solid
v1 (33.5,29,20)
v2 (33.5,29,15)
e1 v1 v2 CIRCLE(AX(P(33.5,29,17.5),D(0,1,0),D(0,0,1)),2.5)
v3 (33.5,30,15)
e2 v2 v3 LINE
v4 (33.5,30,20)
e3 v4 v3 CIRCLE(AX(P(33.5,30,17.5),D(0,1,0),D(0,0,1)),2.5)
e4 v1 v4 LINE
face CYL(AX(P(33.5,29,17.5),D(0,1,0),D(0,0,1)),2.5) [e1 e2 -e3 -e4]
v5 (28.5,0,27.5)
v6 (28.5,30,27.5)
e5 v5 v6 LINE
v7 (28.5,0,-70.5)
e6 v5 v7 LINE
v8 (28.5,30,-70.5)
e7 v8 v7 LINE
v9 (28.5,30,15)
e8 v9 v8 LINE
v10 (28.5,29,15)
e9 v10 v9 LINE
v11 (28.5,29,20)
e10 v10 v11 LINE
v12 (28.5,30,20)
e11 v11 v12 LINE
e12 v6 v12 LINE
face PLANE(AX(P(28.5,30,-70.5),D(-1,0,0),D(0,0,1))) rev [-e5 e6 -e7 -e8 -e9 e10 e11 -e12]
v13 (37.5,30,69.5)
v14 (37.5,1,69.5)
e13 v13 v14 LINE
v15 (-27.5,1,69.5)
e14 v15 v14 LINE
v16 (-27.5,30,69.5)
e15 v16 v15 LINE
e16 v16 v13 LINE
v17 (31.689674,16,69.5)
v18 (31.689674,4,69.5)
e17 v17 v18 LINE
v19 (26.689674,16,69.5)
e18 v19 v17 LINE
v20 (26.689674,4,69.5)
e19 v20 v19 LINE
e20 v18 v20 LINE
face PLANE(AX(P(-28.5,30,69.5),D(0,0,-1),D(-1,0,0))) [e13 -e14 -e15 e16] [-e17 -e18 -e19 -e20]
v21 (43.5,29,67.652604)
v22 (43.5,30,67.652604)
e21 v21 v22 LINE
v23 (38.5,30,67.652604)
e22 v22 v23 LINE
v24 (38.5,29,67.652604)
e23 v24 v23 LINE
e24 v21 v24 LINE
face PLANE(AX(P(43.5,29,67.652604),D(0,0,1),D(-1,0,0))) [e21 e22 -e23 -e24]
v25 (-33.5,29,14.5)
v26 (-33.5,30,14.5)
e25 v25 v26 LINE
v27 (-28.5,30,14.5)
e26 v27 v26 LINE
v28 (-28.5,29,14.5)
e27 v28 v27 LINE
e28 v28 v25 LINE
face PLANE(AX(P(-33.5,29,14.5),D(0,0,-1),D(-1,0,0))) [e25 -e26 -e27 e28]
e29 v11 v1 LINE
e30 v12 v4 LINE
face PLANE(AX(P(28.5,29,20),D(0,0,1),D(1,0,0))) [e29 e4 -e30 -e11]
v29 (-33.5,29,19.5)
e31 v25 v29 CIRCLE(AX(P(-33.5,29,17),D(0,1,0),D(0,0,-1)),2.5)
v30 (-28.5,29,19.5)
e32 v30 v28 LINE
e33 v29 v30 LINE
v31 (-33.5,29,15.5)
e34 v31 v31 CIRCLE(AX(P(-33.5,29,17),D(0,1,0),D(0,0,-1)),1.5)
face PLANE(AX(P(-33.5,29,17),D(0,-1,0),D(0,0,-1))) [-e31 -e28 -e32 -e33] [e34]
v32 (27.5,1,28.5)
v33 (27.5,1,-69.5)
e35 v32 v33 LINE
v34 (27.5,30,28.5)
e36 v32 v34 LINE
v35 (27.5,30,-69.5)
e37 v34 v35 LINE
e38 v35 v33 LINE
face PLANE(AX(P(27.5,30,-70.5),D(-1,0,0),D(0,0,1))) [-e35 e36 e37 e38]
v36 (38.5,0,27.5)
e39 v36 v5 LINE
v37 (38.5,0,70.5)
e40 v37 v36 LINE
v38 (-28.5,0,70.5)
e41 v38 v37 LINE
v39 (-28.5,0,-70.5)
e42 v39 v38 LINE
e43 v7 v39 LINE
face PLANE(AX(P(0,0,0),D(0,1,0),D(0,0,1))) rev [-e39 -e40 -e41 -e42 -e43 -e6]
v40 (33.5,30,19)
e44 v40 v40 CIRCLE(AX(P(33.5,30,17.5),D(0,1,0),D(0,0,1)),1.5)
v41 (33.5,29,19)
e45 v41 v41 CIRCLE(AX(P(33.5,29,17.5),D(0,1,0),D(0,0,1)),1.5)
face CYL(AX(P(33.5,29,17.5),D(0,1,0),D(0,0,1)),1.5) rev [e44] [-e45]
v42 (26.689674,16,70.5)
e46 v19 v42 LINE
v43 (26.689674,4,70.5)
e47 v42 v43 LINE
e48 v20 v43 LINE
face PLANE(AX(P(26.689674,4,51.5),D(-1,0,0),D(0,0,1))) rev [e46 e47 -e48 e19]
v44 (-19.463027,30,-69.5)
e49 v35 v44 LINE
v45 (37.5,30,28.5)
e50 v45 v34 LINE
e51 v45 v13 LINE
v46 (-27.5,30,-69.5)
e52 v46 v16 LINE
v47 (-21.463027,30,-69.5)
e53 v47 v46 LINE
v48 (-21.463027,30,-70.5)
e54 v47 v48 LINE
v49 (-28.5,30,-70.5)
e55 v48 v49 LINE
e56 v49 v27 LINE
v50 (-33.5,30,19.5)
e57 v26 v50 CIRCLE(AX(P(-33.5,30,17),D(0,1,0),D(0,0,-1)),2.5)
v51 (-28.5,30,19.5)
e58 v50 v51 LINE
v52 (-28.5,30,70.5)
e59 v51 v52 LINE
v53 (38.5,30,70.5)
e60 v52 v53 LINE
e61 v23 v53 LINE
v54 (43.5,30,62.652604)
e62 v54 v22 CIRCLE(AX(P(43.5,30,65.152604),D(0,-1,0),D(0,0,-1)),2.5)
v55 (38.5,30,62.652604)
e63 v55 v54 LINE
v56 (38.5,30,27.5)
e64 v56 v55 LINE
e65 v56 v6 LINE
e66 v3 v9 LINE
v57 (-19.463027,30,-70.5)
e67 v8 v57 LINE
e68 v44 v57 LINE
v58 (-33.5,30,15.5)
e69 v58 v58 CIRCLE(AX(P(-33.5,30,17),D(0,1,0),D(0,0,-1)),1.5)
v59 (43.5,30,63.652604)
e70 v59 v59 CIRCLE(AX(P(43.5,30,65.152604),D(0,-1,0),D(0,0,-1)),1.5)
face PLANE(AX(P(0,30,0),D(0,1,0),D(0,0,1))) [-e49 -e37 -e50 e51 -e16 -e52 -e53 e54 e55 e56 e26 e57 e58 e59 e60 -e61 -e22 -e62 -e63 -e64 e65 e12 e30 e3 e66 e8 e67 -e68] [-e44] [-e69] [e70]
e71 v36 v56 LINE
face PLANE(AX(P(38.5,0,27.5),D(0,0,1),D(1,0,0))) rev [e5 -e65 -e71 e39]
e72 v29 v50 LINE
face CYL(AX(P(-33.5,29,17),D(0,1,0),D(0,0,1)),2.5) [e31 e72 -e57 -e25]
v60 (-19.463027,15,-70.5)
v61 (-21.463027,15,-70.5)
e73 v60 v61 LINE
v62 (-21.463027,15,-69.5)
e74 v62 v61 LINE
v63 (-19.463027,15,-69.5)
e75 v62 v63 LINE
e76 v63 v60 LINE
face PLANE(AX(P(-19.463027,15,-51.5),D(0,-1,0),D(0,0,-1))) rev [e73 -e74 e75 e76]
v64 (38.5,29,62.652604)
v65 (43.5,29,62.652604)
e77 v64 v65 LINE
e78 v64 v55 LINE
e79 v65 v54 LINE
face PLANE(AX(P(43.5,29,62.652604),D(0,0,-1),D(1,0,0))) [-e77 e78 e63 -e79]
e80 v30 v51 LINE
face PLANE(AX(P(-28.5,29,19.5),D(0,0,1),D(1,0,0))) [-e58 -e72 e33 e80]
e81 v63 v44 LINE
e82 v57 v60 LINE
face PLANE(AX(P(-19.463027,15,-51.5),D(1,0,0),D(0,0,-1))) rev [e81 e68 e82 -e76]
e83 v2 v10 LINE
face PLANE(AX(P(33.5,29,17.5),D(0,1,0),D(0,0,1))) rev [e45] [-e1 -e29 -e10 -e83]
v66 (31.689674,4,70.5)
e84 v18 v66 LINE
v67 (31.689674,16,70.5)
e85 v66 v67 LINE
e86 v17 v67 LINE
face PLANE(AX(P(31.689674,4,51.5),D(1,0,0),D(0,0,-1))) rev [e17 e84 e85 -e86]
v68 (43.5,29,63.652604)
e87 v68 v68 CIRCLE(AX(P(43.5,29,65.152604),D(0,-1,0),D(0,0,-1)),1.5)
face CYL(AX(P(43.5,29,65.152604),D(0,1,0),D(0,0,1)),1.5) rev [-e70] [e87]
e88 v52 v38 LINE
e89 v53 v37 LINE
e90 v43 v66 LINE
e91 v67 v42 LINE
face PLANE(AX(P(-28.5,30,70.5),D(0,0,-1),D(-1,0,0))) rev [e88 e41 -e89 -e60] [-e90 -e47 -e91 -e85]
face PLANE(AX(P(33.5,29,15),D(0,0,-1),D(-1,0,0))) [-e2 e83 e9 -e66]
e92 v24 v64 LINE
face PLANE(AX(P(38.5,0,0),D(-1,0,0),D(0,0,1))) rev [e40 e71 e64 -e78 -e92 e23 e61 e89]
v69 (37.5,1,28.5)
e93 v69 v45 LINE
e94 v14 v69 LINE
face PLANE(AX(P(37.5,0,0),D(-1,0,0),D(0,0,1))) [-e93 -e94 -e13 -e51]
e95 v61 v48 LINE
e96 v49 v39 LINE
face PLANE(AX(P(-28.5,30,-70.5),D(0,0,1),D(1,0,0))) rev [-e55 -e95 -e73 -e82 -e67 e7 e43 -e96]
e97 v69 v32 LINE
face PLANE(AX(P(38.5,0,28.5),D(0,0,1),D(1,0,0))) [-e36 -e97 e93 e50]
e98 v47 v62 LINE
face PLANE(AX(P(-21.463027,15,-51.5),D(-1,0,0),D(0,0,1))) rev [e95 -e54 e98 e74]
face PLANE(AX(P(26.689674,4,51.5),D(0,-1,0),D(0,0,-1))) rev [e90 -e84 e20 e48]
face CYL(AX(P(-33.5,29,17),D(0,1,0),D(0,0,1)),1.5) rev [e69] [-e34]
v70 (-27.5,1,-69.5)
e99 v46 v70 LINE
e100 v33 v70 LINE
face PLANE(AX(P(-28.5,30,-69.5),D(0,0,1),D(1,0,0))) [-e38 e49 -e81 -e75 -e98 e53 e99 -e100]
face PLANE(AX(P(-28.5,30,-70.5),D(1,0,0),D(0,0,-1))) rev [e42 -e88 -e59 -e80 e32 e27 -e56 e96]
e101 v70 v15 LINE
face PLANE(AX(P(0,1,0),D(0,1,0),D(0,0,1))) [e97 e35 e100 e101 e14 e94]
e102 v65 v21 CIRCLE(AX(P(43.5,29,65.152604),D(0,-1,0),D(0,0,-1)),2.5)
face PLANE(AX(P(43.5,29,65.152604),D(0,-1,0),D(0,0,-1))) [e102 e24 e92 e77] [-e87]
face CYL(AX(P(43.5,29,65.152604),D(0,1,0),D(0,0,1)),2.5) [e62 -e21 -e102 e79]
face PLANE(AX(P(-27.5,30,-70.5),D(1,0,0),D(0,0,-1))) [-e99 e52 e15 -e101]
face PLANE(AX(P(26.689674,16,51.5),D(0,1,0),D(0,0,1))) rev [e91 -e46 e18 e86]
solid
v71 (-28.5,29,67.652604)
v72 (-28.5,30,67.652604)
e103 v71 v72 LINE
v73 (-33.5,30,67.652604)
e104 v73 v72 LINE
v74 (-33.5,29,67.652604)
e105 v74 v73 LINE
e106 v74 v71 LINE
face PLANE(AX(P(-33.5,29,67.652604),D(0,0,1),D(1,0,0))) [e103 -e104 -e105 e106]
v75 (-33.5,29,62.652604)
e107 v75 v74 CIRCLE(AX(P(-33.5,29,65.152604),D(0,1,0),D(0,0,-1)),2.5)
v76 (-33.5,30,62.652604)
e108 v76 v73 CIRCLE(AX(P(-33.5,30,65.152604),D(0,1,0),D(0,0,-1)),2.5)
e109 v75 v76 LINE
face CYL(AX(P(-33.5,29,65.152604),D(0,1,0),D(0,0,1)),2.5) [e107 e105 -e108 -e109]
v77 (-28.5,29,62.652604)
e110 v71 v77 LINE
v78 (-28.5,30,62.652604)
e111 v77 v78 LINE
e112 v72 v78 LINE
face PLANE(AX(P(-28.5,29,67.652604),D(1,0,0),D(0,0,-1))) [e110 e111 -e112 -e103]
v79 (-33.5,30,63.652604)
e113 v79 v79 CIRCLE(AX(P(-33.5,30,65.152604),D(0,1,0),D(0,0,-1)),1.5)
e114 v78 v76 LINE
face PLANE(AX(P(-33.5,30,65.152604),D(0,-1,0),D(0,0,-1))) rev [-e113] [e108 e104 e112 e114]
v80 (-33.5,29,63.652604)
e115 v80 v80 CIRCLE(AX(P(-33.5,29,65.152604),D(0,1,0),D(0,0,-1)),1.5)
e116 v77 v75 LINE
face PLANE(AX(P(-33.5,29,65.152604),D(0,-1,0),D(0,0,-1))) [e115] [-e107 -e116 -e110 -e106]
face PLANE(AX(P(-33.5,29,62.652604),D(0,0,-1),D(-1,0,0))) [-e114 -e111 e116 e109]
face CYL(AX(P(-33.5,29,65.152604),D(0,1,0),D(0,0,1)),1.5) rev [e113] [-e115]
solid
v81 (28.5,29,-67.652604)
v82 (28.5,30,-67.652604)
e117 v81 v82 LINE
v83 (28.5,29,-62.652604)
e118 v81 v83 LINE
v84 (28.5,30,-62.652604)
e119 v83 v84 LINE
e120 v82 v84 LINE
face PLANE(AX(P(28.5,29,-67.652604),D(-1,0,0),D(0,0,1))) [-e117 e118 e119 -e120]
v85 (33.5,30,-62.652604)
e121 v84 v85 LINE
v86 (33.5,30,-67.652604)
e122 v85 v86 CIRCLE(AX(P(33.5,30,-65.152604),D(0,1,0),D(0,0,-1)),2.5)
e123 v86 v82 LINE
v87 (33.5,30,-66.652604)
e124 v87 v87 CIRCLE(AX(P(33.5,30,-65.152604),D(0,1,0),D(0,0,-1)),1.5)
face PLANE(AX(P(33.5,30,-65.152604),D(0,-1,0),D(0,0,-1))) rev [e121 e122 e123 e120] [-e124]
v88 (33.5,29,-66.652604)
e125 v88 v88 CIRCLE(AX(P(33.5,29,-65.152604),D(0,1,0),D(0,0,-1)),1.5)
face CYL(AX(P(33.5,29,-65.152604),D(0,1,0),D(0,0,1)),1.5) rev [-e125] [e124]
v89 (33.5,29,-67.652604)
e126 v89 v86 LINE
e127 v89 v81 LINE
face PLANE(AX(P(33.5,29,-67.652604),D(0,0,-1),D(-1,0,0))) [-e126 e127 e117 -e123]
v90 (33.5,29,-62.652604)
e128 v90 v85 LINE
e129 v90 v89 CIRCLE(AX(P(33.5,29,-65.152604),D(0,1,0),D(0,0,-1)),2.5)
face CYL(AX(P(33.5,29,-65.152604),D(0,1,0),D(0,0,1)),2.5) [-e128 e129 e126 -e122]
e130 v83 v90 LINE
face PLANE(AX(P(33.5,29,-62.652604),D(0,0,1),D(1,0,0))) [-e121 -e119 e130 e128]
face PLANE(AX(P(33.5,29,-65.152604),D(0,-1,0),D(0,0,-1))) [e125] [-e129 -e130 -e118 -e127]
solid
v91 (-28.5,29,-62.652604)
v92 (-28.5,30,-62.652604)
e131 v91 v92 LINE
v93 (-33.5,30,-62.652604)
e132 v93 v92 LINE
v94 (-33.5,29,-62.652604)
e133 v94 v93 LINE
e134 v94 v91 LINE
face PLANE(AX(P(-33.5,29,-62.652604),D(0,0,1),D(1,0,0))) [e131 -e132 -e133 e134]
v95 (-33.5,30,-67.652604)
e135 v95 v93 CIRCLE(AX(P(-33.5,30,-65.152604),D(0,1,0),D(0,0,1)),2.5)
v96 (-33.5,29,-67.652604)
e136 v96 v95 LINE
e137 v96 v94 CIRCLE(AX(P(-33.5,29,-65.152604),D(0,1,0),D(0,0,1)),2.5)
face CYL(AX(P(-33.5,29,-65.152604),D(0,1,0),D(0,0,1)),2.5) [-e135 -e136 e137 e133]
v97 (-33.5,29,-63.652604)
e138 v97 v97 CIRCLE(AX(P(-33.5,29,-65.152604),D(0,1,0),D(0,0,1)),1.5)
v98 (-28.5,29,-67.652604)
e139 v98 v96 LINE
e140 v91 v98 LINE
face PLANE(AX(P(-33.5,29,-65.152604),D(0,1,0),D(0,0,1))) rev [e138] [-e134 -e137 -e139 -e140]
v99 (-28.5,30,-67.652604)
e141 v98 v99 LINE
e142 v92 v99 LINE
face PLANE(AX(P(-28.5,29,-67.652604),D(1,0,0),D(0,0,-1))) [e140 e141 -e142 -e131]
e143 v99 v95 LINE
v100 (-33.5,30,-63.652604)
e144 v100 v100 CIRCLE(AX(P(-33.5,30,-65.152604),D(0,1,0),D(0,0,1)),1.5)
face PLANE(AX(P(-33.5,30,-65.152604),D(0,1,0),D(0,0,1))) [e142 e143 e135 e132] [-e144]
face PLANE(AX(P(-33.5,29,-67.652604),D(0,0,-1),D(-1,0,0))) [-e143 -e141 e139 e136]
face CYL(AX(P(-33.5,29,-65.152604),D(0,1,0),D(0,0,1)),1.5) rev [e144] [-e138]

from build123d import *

# Parameters (mm, degrees)
SKETCH2_W             = 57
SKETCH2_H             = 141
BOSS_EXTRUDE1_DEPTH   = 30
SKETCH3_R             = 1.5
BOSS_EXTRUDE3_DEPTH   = 1
BOSS_EXTRUDE3_2_DEPTH = 1
BOSS_EXTRUDE3_3_DEPTH = 1
SKETCH4_W             = 43
SKETCH4_H             = 30
BOSS_EXTRUDE4_DEPTH   = 10
MIRROR1_START         = 29
MIRROR1_OUTLINE_R     = 1.5
MIRROR1_DEPTH         = 1
SHELL3_START          = -27.5
SHELL3_OUTLINE_W      = 29
SHELL3_OUTLINE_H      = 139
SHELL3_DEPTH          = 55
SHELL3_START_2        = 27.5
SHELL3_2_OUTLINE_W    = 29
SHELL3_2_OUTLINE_H    = 41
SHELL3_2_DEPTH        = 10
SKETCH7_W             = 5
SKETCH7_H             = 12
CUT_EXTRUDE1_DEPTH    = 19
SKETCH8_W             = 2
SKETCH8_H             = 15
CUT_EXTRUDE2_DEPTH    = 19
SKETCH10_R            = 1.5
BOSS_EXTRUDE5_DEPTH   = 1
SKETCH11_R            = 1.5
BOSS_EXTRUDE6_DEPTH   = 1


# Read off the part's stored shape, not the designer's step: Mirror1, Shell3
with BuildPart() as part:
    # Sketch2 → Boss-Extrude1 (new body)
    with BuildSketch(Plane(origin=(0, 0, 0), x_dir=(1, 0, 0), z_dir=(0, 1, 0))):
        Rectangle(SKETCH2_W, SKETCH2_H)
    extrude(amount=BOSS_EXTRUDE1_DEPTH)

    # Sketch4 → Boss-Extrude4 (add)
    with BuildSketch(Plane(origin=(28.5, 0, 0), x_dir=(0, 0, -1), z_dir=(1, 0, 0))):
        with Locations((-49, 15)):
            Rectangle(SKETCH4_W, SKETCH4_H)
    extrude(amount=BOSS_EXTRUDE4_DEPTH)

    # Mirror1 outline → Mirror1 (add)
    with BuildSketch(Plane(origin=(0, 0, 0), x_dir=(1, 0, 0), z_dir=(0, 1, 0)).offset(MIRROR1_START)):
        with BuildLine():
            ThreePointArc((43.5, -67.652604127), (46, -65.152604127), (43.5, -62.652604127))
            Line((43.5, -62.652604127), (38.5, -62.652604127))
            Line((38.5, -62.652604127), (38.5, -67.652604127))
            Line((38.5, -67.652604127), (43.5, -67.652604127))
        make_face()
        with Locations((43.5, -65.152604127)):
            Circle(MIRROR1_OUTLINE_R, mode=Mode.SUBTRACT)
    extrude(amount=MIRROR1_DEPTH)

    # Shell3 outline → Shell3 (cut)
    with BuildSketch(Plane.YZ.offset(SHELL3_START)):
        with Locations((15.5, 0)):
            Rectangle(SHELL3_OUTLINE_W, SHELL3_OUTLINE_H)
    extrude(amount=SHELL3_DEPTH, mode=Mode.SUBTRACT)

    # Shell3 2 outline → Shell3 2 (cut)
    with BuildSketch(Plane.YZ.offset(SHELL3_START_2)):
        with Locations((15.5, 49)):
            Rectangle(SHELL3_2_OUTLINE_W, SHELL3_2_OUTLINE_H)
    extrude(amount=SHELL3_2_DEPTH, mode=Mode.SUBTRACT)

    # Sketch7 → Cut-Extrude1 (cut)
    with BuildSketch(Plane.XY.offset(70.5)):
        with Locations((29.189674396, 10)):
            Rectangle(SKETCH7_W, SKETCH7_H)
    extrude(amount=-CUT_EXTRUDE1_DEPTH, mode=Mode.SUBTRACT)

    # Sketch8 → Cut-Extrude2 (cut)
    with BuildSketch(Plane(origin=(0, 0, -70.5), x_dir=(-1, 0, 0), z_dir=(0, 0, -1))):
        with Locations((20.463026601, 22.5)):
            Rectangle(SKETCH8_W, SKETCH8_H)
    extrude(amount=-CUT_EXTRUDE2_DEPTH, mode=Mode.SUBTRACT)

    # Sketch10 → Boss-Extrude5 (add)
    with BuildSketch(Plane(origin=(0, 30, 0), x_dir=(1, 0, 0), z_dir=(0, 1, 0))):
        with BuildLine():
            Line((33.5, -15), (28.5, -15))
            Line((28.5, -15), (28.5, -20))
            Line((28.5, -20), (33.5, -20))
            ThreePointArc((33.5, -20), (36, -17.5), (33.5, -15))
        make_face()
        with Locations(Location((33.5, -17.5, 0), (0, 0, 270))):
            Circle(SKETCH10_R, mode=Mode.SUBTRACT)
    extrude(amount=-BOSS_EXTRUDE5_DEPTH)

    # Sketch11 → Boss-Extrude6 (add)
    with BuildSketch(Plane(origin=(0, 30, 0), x_dir=(1, 0, 0), z_dir=(0, 1, 0))):
        with BuildLine():
            Line((-28.5, -19.5), (-33.5, -19.5))
            ThreePointArc((-33.5, -19.5), (-36, -17), (-33.5, -14.5))
            Line((-33.5, -14.5), (-28.5, -14.5))
            Line((-28.5, -14.5), (-28.5, -19.5))
        make_face()
        with Locations(Location((-33.5, -17, 0), (0, 0, 90))):
            Circle(SKETCH11_R, mode=Mode.SUBTRACT)
    extrude(amount=-BOSS_EXTRUDE6_DEPTH)


with BuildPart() as body_2:
    # Sketch3 → Boss-Extrude3 (new body)
    with BuildSketch(Plane(origin=(0, 30, 0), x_dir=(1, 0, 0), z_dir=(0, 1, 0))):
        with BuildLine():
            Line((-33.5, 67.652604127), (-28.5, 67.652604127))
            Line((-28.5, 67.652604127), (-28.5, 62.652604127))
            Line((-28.5, 62.652604127), (-33.5, 62.652604127))
            ThreePointArc((-33.5, 62.652604127), (-36, 65.152604127), (-33.5, 67.652604127))
        make_face()
        with Locations(Location((-33.5, 65.152604127, 0), (0, 0, 270))):
            Circle(SKETCH3_R, mode=Mode.SUBTRACT)
    extrude(amount=-BOSS_EXTRUDE3_DEPTH)


with BuildPart() as body_3:
    # Sketch3 → Boss-Extrude3 2 (new body)
    with BuildSketch(Plane(origin=(0, 30, 0), x_dir=(1, 0, 0), z_dir=(0, 1, 0))):
        with BuildLine():
            Line((-28.5, -67.652604127), (-28.5, -62.652604127))
            Line((-28.5, -62.652604127), (-33.5, -62.652604127))
            ThreePointArc((-33.5, -62.652604127), (-36, -65.152604127), (-33.5, -67.652604127))
            Line((-33.5, -67.652604127), (-28.5, -67.652604127))
        make_face()
        with Locations(Location((-33.5, -65.152604127, 0), (0, 0, 90))):
            Circle(SKETCH3_R, mode=Mode.SUBTRACT)
    extrude(amount=-BOSS_EXTRUDE3_2_DEPTH)


with BuildPart() as body_4:
    # Sketch3 → Boss-Extrude3 3 (new body)
    with BuildSketch(Plane(origin=(0, 30, 0), x_dir=(1, 0, 0), z_dir=(0, 1, 0))):
        with BuildLine():
            Line((28.5, 67.652604127), (28.5, 62.652604127))
            Line((28.5, 62.652604127), (33.5, 62.652604127))
            ThreePointArc((33.5, 62.652604127), (36, 65.152604127), (33.5, 67.652604127))
            Line((33.5, 67.652604127), (28.5, 67.652604127))
        make_face()
        with Locations(Location((33.5, 65.152604127, 0), (0, 0, 90))):
            Circle(SKETCH3_R, mode=Mode.SUBTRACT)
    extrude(amount=-BOSS_EXTRUDE3_3_DEPTH)


solid = Compound([part.part, body_2.part, body_3.part, body_4.part])
